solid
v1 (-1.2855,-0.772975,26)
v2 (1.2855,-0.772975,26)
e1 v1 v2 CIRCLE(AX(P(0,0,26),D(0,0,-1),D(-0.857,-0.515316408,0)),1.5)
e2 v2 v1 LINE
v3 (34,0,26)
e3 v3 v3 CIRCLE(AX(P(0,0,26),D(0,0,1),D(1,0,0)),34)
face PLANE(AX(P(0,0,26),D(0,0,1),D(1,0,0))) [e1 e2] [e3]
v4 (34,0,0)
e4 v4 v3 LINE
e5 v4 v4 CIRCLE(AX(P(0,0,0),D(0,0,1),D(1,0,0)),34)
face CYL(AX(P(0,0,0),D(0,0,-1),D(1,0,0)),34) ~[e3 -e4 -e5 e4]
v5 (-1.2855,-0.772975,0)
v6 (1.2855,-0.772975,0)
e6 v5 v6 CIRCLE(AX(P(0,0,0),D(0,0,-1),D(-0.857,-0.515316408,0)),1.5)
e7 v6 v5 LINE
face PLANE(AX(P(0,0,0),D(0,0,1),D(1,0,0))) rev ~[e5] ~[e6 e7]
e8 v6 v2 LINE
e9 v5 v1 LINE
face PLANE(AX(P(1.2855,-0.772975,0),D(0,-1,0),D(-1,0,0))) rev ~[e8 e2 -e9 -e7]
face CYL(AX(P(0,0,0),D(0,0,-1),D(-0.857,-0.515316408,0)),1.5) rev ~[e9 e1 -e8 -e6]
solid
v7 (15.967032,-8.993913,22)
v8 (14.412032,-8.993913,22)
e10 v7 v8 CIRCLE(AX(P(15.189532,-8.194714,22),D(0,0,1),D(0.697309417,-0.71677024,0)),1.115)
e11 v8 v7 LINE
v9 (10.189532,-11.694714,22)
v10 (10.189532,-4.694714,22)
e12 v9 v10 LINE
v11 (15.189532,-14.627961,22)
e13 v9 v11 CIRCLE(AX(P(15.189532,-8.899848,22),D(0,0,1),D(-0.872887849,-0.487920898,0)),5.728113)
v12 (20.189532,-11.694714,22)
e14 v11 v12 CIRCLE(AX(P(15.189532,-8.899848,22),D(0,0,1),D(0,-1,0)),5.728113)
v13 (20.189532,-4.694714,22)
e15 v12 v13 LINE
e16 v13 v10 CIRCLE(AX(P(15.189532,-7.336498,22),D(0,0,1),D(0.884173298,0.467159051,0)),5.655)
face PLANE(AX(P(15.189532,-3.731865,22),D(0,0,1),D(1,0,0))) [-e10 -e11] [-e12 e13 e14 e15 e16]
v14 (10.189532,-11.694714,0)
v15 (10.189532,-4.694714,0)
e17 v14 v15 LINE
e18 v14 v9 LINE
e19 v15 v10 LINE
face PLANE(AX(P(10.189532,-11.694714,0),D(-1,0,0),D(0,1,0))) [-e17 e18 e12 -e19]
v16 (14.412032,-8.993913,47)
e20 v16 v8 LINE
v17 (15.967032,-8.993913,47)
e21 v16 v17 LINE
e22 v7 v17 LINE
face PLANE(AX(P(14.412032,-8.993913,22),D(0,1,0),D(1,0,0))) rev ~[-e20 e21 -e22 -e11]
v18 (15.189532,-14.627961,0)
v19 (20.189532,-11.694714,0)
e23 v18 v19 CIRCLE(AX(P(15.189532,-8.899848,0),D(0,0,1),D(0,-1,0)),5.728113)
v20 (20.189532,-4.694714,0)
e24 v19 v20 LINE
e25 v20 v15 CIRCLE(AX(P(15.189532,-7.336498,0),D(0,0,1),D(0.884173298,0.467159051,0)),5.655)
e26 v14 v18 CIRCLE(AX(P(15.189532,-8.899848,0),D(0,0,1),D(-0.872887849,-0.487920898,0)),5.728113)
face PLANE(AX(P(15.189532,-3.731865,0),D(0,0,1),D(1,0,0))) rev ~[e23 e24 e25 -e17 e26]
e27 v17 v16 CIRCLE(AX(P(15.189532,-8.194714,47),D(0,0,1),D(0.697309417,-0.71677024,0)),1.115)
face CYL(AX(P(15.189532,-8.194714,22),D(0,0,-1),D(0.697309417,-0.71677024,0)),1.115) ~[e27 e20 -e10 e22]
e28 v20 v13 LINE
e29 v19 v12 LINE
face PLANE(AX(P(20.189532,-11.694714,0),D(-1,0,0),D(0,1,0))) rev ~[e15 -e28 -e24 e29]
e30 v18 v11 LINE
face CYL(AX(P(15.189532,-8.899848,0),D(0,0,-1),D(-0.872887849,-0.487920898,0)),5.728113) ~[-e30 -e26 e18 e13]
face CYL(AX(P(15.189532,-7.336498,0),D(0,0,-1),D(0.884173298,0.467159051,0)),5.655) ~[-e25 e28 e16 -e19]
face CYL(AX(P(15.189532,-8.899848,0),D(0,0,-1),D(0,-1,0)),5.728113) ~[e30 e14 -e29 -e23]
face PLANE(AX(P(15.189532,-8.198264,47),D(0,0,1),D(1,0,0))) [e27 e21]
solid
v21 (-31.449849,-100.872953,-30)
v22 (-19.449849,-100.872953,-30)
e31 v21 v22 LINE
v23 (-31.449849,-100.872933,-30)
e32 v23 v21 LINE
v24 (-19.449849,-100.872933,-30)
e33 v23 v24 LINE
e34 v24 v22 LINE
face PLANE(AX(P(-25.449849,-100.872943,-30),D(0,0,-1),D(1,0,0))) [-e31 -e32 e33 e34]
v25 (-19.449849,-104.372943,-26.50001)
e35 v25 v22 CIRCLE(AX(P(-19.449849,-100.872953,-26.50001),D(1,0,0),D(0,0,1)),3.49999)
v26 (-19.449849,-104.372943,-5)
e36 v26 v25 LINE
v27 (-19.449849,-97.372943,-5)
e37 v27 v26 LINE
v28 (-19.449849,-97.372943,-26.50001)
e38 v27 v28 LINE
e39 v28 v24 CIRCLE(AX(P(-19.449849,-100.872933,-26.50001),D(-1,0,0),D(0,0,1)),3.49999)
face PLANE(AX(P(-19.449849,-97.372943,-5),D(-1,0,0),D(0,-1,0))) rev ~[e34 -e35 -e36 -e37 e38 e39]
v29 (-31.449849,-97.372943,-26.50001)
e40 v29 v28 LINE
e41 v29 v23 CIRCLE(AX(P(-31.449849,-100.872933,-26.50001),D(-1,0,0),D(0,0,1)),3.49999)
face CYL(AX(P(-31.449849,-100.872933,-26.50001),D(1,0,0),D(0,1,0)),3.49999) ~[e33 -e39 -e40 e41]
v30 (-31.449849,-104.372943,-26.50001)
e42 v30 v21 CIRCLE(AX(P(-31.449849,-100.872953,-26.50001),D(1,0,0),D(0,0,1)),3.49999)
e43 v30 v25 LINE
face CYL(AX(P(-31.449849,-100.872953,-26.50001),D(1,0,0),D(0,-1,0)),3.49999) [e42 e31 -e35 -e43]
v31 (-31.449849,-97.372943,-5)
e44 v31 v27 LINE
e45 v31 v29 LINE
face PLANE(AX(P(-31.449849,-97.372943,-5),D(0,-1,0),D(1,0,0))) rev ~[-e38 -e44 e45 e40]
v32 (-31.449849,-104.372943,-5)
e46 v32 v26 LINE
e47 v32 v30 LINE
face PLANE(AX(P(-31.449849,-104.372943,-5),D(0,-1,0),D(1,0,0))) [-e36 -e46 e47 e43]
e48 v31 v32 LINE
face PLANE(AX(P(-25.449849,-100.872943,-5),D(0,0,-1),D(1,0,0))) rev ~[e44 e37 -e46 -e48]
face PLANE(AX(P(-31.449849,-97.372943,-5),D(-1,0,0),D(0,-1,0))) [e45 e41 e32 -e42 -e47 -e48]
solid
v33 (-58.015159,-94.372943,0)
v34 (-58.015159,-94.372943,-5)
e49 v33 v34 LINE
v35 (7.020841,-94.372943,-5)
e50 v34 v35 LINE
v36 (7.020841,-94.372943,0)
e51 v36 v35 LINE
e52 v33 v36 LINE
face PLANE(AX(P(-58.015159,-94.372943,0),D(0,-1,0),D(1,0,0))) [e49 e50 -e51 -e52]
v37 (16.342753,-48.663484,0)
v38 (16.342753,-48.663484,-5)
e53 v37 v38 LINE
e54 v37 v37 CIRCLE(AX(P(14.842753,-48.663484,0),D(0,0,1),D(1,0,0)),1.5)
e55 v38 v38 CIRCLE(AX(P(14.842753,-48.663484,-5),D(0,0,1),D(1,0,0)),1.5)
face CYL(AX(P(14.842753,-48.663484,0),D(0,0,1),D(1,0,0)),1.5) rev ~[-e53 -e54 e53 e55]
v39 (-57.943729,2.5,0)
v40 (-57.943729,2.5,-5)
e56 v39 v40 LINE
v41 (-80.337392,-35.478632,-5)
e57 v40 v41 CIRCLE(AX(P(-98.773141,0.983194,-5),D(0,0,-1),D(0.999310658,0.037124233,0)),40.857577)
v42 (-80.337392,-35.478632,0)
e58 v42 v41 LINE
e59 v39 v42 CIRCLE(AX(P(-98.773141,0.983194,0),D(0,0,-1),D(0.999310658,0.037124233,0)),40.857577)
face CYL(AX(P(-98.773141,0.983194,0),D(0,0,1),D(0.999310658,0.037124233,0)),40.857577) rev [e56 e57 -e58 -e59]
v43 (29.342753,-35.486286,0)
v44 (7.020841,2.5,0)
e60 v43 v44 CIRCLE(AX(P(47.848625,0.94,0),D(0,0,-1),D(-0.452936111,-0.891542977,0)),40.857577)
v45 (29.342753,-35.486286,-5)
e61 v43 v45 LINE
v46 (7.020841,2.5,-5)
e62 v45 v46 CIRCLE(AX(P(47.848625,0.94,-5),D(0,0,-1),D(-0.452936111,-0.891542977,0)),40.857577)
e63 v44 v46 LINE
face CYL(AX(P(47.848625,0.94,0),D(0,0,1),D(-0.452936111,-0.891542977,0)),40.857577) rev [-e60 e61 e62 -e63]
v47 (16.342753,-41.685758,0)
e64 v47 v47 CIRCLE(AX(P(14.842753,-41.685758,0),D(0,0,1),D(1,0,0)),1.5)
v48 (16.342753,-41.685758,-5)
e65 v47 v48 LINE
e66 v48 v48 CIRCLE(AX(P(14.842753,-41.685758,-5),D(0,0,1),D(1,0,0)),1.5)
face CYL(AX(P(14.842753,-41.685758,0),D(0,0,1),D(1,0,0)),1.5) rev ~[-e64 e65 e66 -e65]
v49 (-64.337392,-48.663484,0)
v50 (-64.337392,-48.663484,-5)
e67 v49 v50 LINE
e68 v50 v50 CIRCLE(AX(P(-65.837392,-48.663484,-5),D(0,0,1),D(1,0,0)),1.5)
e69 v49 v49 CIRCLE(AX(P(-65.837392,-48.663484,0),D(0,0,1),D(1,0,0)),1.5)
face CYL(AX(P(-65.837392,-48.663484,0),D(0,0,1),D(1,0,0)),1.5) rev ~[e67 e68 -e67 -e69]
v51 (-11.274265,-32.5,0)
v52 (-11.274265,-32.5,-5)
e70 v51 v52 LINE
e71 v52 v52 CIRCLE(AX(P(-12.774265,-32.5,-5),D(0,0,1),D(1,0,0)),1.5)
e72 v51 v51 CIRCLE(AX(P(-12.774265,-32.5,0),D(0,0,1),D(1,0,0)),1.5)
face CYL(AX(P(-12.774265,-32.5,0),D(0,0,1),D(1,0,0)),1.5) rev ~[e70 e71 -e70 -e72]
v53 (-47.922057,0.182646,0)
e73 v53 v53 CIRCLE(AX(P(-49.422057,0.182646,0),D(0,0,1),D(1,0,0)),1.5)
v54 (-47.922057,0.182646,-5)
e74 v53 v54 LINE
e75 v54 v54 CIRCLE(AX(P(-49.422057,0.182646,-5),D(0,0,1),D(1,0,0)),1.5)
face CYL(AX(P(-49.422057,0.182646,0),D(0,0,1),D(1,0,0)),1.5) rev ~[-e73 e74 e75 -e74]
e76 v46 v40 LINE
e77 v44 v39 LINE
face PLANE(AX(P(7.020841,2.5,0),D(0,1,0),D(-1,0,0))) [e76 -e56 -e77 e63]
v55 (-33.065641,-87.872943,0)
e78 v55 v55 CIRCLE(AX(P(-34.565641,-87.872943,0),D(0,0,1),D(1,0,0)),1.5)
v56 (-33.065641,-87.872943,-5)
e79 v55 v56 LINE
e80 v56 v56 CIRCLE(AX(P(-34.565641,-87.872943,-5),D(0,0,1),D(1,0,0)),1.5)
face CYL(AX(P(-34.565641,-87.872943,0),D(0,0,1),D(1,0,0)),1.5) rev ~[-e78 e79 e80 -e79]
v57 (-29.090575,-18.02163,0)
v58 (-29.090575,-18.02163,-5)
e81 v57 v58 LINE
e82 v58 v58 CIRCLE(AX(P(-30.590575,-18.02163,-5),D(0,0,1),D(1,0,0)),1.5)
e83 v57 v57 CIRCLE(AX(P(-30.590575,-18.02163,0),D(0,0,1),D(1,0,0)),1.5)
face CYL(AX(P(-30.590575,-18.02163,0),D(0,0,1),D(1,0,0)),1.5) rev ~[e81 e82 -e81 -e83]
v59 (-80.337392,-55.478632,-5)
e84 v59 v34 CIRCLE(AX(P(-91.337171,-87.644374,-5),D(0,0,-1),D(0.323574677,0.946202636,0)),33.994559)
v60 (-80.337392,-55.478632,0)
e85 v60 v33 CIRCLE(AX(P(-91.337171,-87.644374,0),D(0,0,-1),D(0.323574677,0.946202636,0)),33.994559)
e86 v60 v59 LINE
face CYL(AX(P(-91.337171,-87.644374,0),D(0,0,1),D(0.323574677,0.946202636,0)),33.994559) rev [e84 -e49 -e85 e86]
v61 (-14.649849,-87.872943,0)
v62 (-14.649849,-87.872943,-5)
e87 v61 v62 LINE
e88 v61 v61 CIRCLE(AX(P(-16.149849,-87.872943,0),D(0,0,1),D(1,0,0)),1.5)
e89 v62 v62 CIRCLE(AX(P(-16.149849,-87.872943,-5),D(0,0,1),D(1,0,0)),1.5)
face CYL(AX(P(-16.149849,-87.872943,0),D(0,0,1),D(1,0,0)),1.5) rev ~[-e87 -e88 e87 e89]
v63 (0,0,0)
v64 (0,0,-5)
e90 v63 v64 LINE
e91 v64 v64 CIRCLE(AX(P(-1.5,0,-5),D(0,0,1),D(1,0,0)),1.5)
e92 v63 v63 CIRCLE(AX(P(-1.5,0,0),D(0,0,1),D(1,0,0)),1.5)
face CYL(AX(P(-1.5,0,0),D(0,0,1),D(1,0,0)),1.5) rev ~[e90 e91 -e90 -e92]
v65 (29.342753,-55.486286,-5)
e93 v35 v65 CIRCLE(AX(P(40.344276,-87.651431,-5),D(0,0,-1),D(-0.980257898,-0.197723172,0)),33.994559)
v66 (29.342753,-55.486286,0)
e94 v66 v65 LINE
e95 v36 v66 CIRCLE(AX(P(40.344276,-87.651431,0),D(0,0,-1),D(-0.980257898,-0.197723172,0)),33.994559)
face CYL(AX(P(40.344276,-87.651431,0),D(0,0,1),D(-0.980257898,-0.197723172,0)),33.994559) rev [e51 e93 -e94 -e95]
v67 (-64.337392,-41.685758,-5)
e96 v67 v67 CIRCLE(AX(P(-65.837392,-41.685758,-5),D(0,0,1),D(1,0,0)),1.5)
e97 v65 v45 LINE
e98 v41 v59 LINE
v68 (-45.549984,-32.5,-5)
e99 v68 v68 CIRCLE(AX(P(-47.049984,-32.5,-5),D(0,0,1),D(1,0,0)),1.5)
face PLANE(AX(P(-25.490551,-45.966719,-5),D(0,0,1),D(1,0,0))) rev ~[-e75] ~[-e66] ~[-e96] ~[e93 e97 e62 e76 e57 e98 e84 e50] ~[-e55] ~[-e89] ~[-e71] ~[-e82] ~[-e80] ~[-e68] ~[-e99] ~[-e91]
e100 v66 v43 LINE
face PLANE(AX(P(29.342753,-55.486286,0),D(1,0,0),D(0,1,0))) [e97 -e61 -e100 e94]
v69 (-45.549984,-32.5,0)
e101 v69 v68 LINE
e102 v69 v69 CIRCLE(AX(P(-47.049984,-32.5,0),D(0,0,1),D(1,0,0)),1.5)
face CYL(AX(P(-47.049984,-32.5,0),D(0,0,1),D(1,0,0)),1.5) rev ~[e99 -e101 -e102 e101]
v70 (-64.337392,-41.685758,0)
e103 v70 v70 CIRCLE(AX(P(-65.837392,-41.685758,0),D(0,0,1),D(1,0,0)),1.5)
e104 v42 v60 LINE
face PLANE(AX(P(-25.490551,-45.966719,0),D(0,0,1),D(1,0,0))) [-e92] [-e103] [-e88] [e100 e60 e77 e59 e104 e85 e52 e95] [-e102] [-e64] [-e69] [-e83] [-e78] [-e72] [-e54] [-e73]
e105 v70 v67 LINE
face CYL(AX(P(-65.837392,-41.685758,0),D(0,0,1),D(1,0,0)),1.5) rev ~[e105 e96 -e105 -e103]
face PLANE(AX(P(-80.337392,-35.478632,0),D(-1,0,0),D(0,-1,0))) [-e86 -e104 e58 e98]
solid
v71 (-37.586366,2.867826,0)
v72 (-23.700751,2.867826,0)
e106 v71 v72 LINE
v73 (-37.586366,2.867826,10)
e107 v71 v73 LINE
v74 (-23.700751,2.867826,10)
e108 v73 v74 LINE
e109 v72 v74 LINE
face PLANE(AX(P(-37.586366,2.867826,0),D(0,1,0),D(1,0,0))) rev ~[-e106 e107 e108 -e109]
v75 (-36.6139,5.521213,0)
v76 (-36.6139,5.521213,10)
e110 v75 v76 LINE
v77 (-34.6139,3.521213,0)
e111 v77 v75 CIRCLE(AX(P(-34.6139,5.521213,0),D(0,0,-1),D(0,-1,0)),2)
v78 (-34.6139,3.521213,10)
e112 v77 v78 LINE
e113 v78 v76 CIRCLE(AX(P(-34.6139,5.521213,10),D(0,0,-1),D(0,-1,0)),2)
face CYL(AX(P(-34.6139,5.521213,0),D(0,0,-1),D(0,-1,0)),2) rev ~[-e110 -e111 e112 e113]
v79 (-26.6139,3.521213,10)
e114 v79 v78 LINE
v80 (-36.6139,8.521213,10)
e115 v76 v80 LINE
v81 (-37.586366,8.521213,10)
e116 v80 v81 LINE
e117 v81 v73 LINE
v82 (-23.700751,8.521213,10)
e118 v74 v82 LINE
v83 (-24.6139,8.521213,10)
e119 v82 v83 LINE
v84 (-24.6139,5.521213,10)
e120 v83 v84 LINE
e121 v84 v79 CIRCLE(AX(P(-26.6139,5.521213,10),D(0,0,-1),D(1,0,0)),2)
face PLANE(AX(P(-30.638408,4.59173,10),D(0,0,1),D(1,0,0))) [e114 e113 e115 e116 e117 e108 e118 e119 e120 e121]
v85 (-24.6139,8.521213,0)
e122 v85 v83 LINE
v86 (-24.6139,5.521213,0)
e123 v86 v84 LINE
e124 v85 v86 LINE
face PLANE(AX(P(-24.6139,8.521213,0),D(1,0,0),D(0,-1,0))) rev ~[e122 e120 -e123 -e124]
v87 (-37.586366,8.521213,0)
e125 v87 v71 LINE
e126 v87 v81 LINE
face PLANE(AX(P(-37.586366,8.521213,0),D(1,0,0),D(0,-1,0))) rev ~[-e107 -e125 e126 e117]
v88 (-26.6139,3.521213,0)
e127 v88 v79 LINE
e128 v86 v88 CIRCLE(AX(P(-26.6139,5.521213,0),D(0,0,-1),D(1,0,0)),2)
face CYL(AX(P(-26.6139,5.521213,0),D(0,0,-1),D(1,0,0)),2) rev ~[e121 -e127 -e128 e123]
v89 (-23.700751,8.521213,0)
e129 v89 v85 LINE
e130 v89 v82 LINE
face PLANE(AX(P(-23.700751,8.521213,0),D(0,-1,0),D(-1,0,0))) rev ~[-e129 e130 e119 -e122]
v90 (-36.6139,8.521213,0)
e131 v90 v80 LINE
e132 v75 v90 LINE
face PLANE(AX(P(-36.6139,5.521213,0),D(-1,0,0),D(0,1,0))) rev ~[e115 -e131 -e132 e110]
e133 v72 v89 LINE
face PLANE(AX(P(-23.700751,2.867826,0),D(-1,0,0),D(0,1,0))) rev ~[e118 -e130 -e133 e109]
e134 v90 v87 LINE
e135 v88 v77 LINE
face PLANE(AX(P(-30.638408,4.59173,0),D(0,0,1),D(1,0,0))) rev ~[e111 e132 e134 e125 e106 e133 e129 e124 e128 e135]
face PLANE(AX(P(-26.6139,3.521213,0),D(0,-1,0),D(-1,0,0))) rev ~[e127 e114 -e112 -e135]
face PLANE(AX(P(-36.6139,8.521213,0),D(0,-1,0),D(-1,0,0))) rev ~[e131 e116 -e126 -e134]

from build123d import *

# Parameters (mm, degrees)
F0_R      = 34
F1_DEPTH  = 26
F2_DEPTH  = 26
F3_W      = 10
F3_H      = 7
F4_DEPTH  = 22
F6_DEPTH  = 17
F7_R      = 1.5
F8_DEPTH  = 5
F9_W      = 12
F9_H      = 7
F10_DEPTH = 25
F11_R     = 3.49999
F12_DEPTH = 25
F14_DEPTH = 10


# Not quite as in the source:
# - a fillet or chamfer is up to 0.001 mm smaller than in the source, because OpenCascade refuses the exact size


with BuildPart() as f1:
    # F0 (on Top) → F1 (new body)
    with BuildSketch(Plane.XY):
        Circle(F0_R)
        with BuildLine():
            ThreePointArc((-1.2855, -0.7729746115), (0, 1.5), (1.2855, -0.7729746115))
            Line((1.2855, -0.7729746115), (-1.2855, -0.7729746115))
        make_face(mode=Mode.SUBTRACT)
    extrude(amount=F1_DEPTH)

    # F0 (on Top) → F2 (join)
    with BuildSketch(Plane.XY):
        Circle(F0_R)
        with BuildLine():
            ThreePointArc((-1.2855, -0.7729746115), (0, 1.5), (1.2855, -0.7729746115))
            Line((1.2855, -0.7729746115), (-1.2855, -0.7729746115))
        make_face(mode=Mode.SUBTRACT)
    extrude(amount=F2_DEPTH)


with BuildPart() as f4:
    # F3 (on Top) → F4 (new body)
    with BuildSketch(Plane.XY):
        with BuildLine():
            ThreePointArc((15.1895321906, -1.681498219), (12.2706510675, -2.4930327252), (10.1895321906, -4.6947137841))
            Line((10.1895321906, -4.6947137841), (20.1895321906, -4.6947137841))
            ThreePointArc((20.1895321906, -4.6947137841), (18.1084133136, -2.4930327252), (15.1895321906, -1.681498219))
        make_face()
        with BuildLine():
            Line((20.1895321906, -11.6947137841), (10.1895321906, -11.6947137841))
            ThreePointArc((10.1895321906, -11.6947137841), (12.2910870504, -13.8405250788), (15.1895321906, -14.6279606067))
            ThreePointArc((15.1895321906, -14.6279606067), (18.0879773307, -13.8405250788), (20.1895321906, -11.6947137841))
        make_face()
        with Locations((15.1895321906, -8.1947137841)):
            Rectangle(F3_W, F3_H)
    extrude(amount=F4_DEPTH)

    # F5 (on face) → F6 (join)
    with BuildSketch(Plane.XY.offset(22)):
        with BuildLine():
            Line((14.4120321906, -8.9939126017), (15.9670321906, -8.9939126017))
            ThreePointArc((15.9670321906, -8.9939126017), (15.1895321906, -7.0797137841), (14.4120321906, -8.9939126017))
        make_face()
    extrude(amount=F6_DEPTH)

    # F5 (on face) → F12 (join)
    with BuildSketch(Plane.XY.offset(22)):
        with BuildLine():
            Line((14.4120321906, -8.9939126017), (15.9670321906, -8.9939126017))
            ThreePointArc((15.9670321906, -8.9939126017), (15.1895321906, -7.0797137841), (14.4120321906, -8.9939126017))
        make_face()
    extrude(amount=F12_DEPTH)


with BuildPart() as f8:
    # F7 (on Top) → F8 (new body)
    with BuildSketch(Plane.XY):
        with BuildLine():
            Line((7.0208405241, 2.5), (-57.9437288691, 2.5))
            ThreePointArc((-57.9437288691, 2.5), (-63.5781988321, -19.7690987419), (-80.3373921663, -35.4786324501))
            Line((-80.3373921663, -35.4786324501), (-80.3373921663, -55.4786324501))
            ThreePointArc((-80.3373921663, -55.4786324501), (-61.8533257996, -70.7229983964), (-58.0151594759, -94.3729430437))
            Line((-58.0151594759, -94.3729430437), (-57.9791594759, -94.3729430437))
            Line((-57.9791594759, -94.3729430437), (7.0208405241, -94.3729430437))
            ThreePointArc((7.0208405241, -94.3729430437), (10.8617640259, -70.7277326236), (29.3427532497, -55.4862856296))
            Line((29.3427532497, -55.4862856296), (29.3427532497, -35.4862856296))
            ThreePointArc((29.3427532497, -35.4862856296), (12.6227799412, -19.7597925818), (7.0208405241, 2.5))
        make_face()
        with Locations((-34.5656405118, -87.8729430437)):
            Circle(F7_R, mode=Mode.SUBTRACT)
        with Locations((-65.8373921663, -48.6634840438)):
            Circle(F7_R, mode=Mode.SUBTRACT)
        with Locations((-16.1498492515, -87.8729430437)):
            Circle(F7_R, mode=Mode.SUBTRACT)
        with Locations((14.8427532497, -48.6634840438)):
            Circle(F7_R, mode=Mode.SUBTRACT)
        with Locations((-65.8373921663, -41.6857580474)):
            Circle(F7_R, mode=Mode.SUBTRACT)
        with Locations((-47.0499843359, -32.5)):
            Circle(F7_R, mode=Mode.SUBTRACT)
        with Locations((-30.5905751884, -18.0216301233)):
            Circle(F7_R, mode=Mode.SUBTRACT)
        with Locations((-49.4220566393, 0.1826457996)):
            Circle(F7_R, mode=Mode.SUBTRACT)
        with Locations((-12.7742653713, -32.5)):
            Circle(F7_R, mode=Mode.SUBTRACT)
        with Locations((14.8427532497, -41.6857580474)):
            Circle(F7_R, mode=Mode.SUBTRACT)
        with Locations((-1.5, 0)):
            Circle(F7_R, mode=Mode.SUBTRACT)
    extrude(amount=-F8_DEPTH)


with BuildPart() as f10:
    # F9 (on face) → F10 (new body)
    with BuildSketch(Plane(origin=(0, 0, -5), x_dir=(1, 0, 0), z_dir=(0, 0, -1))):
        with Locations((-25.4498492515, 100.8729430437)):
            Rectangle(F9_W, F9_H)
    extrude(amount=F10_DEPTH)

    # F11 (radius 3.5 in the source; OpenCascade refuses exactly that, so slightly less here)
    f11_edges = [f10.edges().sort_by_distance(p)[0] for p in [
        (-25.449849, -104.372943, -30),
        (-25.449849, -97.372943, -30),
    ]]
    fillet(f11_edges, radius=F11_R)


with BuildPart() as f14:
    # F13 (on Top) → F14 (new body)
    with BuildSketch(Plane.XY):
        with BuildLine():
            Line((-26.6139002144, 3.5212130751), (-34.6139002144, 3.5212130751))
            ThreePointArc((-34.6139002144, 3.5212130751), (-36.0281137768, 4.1069995128), (-36.6139002144, 5.5212130751))
            Line((-36.6139002144, 5.5212130751), (-36.6139002144, 8.5212130751))
            Line((-36.6139002144, 8.5212130751), (-37.5863661141, 8.5212130751))
            Line((-37.5863661141, 8.5212130751), (-37.5863661141, 2.867825795))
            Line((-37.5863661141, 2.867825795), (-23.7007507206, 2.867825795))
            Line((-23.7007507206, 2.867825795), (-23.7007507206, 8.5212130751))
            Line((-23.7007507206, 8.5212130751), (-24.6139002144, 8.5212130751))
            Line((-24.6139002144, 8.5212130751), (-24.6139002144, 5.5212130751))
            ThreePointArc((-24.6139002144, 5.5212130751), (-25.1996866521, 4.1069995128), (-26.6139002144, 3.5212130751))
        make_face()
    extrude(amount=F14_DEPTH)


solid = Compound([f1.part, f4.part, f8.part, f10.part, f14.part])
